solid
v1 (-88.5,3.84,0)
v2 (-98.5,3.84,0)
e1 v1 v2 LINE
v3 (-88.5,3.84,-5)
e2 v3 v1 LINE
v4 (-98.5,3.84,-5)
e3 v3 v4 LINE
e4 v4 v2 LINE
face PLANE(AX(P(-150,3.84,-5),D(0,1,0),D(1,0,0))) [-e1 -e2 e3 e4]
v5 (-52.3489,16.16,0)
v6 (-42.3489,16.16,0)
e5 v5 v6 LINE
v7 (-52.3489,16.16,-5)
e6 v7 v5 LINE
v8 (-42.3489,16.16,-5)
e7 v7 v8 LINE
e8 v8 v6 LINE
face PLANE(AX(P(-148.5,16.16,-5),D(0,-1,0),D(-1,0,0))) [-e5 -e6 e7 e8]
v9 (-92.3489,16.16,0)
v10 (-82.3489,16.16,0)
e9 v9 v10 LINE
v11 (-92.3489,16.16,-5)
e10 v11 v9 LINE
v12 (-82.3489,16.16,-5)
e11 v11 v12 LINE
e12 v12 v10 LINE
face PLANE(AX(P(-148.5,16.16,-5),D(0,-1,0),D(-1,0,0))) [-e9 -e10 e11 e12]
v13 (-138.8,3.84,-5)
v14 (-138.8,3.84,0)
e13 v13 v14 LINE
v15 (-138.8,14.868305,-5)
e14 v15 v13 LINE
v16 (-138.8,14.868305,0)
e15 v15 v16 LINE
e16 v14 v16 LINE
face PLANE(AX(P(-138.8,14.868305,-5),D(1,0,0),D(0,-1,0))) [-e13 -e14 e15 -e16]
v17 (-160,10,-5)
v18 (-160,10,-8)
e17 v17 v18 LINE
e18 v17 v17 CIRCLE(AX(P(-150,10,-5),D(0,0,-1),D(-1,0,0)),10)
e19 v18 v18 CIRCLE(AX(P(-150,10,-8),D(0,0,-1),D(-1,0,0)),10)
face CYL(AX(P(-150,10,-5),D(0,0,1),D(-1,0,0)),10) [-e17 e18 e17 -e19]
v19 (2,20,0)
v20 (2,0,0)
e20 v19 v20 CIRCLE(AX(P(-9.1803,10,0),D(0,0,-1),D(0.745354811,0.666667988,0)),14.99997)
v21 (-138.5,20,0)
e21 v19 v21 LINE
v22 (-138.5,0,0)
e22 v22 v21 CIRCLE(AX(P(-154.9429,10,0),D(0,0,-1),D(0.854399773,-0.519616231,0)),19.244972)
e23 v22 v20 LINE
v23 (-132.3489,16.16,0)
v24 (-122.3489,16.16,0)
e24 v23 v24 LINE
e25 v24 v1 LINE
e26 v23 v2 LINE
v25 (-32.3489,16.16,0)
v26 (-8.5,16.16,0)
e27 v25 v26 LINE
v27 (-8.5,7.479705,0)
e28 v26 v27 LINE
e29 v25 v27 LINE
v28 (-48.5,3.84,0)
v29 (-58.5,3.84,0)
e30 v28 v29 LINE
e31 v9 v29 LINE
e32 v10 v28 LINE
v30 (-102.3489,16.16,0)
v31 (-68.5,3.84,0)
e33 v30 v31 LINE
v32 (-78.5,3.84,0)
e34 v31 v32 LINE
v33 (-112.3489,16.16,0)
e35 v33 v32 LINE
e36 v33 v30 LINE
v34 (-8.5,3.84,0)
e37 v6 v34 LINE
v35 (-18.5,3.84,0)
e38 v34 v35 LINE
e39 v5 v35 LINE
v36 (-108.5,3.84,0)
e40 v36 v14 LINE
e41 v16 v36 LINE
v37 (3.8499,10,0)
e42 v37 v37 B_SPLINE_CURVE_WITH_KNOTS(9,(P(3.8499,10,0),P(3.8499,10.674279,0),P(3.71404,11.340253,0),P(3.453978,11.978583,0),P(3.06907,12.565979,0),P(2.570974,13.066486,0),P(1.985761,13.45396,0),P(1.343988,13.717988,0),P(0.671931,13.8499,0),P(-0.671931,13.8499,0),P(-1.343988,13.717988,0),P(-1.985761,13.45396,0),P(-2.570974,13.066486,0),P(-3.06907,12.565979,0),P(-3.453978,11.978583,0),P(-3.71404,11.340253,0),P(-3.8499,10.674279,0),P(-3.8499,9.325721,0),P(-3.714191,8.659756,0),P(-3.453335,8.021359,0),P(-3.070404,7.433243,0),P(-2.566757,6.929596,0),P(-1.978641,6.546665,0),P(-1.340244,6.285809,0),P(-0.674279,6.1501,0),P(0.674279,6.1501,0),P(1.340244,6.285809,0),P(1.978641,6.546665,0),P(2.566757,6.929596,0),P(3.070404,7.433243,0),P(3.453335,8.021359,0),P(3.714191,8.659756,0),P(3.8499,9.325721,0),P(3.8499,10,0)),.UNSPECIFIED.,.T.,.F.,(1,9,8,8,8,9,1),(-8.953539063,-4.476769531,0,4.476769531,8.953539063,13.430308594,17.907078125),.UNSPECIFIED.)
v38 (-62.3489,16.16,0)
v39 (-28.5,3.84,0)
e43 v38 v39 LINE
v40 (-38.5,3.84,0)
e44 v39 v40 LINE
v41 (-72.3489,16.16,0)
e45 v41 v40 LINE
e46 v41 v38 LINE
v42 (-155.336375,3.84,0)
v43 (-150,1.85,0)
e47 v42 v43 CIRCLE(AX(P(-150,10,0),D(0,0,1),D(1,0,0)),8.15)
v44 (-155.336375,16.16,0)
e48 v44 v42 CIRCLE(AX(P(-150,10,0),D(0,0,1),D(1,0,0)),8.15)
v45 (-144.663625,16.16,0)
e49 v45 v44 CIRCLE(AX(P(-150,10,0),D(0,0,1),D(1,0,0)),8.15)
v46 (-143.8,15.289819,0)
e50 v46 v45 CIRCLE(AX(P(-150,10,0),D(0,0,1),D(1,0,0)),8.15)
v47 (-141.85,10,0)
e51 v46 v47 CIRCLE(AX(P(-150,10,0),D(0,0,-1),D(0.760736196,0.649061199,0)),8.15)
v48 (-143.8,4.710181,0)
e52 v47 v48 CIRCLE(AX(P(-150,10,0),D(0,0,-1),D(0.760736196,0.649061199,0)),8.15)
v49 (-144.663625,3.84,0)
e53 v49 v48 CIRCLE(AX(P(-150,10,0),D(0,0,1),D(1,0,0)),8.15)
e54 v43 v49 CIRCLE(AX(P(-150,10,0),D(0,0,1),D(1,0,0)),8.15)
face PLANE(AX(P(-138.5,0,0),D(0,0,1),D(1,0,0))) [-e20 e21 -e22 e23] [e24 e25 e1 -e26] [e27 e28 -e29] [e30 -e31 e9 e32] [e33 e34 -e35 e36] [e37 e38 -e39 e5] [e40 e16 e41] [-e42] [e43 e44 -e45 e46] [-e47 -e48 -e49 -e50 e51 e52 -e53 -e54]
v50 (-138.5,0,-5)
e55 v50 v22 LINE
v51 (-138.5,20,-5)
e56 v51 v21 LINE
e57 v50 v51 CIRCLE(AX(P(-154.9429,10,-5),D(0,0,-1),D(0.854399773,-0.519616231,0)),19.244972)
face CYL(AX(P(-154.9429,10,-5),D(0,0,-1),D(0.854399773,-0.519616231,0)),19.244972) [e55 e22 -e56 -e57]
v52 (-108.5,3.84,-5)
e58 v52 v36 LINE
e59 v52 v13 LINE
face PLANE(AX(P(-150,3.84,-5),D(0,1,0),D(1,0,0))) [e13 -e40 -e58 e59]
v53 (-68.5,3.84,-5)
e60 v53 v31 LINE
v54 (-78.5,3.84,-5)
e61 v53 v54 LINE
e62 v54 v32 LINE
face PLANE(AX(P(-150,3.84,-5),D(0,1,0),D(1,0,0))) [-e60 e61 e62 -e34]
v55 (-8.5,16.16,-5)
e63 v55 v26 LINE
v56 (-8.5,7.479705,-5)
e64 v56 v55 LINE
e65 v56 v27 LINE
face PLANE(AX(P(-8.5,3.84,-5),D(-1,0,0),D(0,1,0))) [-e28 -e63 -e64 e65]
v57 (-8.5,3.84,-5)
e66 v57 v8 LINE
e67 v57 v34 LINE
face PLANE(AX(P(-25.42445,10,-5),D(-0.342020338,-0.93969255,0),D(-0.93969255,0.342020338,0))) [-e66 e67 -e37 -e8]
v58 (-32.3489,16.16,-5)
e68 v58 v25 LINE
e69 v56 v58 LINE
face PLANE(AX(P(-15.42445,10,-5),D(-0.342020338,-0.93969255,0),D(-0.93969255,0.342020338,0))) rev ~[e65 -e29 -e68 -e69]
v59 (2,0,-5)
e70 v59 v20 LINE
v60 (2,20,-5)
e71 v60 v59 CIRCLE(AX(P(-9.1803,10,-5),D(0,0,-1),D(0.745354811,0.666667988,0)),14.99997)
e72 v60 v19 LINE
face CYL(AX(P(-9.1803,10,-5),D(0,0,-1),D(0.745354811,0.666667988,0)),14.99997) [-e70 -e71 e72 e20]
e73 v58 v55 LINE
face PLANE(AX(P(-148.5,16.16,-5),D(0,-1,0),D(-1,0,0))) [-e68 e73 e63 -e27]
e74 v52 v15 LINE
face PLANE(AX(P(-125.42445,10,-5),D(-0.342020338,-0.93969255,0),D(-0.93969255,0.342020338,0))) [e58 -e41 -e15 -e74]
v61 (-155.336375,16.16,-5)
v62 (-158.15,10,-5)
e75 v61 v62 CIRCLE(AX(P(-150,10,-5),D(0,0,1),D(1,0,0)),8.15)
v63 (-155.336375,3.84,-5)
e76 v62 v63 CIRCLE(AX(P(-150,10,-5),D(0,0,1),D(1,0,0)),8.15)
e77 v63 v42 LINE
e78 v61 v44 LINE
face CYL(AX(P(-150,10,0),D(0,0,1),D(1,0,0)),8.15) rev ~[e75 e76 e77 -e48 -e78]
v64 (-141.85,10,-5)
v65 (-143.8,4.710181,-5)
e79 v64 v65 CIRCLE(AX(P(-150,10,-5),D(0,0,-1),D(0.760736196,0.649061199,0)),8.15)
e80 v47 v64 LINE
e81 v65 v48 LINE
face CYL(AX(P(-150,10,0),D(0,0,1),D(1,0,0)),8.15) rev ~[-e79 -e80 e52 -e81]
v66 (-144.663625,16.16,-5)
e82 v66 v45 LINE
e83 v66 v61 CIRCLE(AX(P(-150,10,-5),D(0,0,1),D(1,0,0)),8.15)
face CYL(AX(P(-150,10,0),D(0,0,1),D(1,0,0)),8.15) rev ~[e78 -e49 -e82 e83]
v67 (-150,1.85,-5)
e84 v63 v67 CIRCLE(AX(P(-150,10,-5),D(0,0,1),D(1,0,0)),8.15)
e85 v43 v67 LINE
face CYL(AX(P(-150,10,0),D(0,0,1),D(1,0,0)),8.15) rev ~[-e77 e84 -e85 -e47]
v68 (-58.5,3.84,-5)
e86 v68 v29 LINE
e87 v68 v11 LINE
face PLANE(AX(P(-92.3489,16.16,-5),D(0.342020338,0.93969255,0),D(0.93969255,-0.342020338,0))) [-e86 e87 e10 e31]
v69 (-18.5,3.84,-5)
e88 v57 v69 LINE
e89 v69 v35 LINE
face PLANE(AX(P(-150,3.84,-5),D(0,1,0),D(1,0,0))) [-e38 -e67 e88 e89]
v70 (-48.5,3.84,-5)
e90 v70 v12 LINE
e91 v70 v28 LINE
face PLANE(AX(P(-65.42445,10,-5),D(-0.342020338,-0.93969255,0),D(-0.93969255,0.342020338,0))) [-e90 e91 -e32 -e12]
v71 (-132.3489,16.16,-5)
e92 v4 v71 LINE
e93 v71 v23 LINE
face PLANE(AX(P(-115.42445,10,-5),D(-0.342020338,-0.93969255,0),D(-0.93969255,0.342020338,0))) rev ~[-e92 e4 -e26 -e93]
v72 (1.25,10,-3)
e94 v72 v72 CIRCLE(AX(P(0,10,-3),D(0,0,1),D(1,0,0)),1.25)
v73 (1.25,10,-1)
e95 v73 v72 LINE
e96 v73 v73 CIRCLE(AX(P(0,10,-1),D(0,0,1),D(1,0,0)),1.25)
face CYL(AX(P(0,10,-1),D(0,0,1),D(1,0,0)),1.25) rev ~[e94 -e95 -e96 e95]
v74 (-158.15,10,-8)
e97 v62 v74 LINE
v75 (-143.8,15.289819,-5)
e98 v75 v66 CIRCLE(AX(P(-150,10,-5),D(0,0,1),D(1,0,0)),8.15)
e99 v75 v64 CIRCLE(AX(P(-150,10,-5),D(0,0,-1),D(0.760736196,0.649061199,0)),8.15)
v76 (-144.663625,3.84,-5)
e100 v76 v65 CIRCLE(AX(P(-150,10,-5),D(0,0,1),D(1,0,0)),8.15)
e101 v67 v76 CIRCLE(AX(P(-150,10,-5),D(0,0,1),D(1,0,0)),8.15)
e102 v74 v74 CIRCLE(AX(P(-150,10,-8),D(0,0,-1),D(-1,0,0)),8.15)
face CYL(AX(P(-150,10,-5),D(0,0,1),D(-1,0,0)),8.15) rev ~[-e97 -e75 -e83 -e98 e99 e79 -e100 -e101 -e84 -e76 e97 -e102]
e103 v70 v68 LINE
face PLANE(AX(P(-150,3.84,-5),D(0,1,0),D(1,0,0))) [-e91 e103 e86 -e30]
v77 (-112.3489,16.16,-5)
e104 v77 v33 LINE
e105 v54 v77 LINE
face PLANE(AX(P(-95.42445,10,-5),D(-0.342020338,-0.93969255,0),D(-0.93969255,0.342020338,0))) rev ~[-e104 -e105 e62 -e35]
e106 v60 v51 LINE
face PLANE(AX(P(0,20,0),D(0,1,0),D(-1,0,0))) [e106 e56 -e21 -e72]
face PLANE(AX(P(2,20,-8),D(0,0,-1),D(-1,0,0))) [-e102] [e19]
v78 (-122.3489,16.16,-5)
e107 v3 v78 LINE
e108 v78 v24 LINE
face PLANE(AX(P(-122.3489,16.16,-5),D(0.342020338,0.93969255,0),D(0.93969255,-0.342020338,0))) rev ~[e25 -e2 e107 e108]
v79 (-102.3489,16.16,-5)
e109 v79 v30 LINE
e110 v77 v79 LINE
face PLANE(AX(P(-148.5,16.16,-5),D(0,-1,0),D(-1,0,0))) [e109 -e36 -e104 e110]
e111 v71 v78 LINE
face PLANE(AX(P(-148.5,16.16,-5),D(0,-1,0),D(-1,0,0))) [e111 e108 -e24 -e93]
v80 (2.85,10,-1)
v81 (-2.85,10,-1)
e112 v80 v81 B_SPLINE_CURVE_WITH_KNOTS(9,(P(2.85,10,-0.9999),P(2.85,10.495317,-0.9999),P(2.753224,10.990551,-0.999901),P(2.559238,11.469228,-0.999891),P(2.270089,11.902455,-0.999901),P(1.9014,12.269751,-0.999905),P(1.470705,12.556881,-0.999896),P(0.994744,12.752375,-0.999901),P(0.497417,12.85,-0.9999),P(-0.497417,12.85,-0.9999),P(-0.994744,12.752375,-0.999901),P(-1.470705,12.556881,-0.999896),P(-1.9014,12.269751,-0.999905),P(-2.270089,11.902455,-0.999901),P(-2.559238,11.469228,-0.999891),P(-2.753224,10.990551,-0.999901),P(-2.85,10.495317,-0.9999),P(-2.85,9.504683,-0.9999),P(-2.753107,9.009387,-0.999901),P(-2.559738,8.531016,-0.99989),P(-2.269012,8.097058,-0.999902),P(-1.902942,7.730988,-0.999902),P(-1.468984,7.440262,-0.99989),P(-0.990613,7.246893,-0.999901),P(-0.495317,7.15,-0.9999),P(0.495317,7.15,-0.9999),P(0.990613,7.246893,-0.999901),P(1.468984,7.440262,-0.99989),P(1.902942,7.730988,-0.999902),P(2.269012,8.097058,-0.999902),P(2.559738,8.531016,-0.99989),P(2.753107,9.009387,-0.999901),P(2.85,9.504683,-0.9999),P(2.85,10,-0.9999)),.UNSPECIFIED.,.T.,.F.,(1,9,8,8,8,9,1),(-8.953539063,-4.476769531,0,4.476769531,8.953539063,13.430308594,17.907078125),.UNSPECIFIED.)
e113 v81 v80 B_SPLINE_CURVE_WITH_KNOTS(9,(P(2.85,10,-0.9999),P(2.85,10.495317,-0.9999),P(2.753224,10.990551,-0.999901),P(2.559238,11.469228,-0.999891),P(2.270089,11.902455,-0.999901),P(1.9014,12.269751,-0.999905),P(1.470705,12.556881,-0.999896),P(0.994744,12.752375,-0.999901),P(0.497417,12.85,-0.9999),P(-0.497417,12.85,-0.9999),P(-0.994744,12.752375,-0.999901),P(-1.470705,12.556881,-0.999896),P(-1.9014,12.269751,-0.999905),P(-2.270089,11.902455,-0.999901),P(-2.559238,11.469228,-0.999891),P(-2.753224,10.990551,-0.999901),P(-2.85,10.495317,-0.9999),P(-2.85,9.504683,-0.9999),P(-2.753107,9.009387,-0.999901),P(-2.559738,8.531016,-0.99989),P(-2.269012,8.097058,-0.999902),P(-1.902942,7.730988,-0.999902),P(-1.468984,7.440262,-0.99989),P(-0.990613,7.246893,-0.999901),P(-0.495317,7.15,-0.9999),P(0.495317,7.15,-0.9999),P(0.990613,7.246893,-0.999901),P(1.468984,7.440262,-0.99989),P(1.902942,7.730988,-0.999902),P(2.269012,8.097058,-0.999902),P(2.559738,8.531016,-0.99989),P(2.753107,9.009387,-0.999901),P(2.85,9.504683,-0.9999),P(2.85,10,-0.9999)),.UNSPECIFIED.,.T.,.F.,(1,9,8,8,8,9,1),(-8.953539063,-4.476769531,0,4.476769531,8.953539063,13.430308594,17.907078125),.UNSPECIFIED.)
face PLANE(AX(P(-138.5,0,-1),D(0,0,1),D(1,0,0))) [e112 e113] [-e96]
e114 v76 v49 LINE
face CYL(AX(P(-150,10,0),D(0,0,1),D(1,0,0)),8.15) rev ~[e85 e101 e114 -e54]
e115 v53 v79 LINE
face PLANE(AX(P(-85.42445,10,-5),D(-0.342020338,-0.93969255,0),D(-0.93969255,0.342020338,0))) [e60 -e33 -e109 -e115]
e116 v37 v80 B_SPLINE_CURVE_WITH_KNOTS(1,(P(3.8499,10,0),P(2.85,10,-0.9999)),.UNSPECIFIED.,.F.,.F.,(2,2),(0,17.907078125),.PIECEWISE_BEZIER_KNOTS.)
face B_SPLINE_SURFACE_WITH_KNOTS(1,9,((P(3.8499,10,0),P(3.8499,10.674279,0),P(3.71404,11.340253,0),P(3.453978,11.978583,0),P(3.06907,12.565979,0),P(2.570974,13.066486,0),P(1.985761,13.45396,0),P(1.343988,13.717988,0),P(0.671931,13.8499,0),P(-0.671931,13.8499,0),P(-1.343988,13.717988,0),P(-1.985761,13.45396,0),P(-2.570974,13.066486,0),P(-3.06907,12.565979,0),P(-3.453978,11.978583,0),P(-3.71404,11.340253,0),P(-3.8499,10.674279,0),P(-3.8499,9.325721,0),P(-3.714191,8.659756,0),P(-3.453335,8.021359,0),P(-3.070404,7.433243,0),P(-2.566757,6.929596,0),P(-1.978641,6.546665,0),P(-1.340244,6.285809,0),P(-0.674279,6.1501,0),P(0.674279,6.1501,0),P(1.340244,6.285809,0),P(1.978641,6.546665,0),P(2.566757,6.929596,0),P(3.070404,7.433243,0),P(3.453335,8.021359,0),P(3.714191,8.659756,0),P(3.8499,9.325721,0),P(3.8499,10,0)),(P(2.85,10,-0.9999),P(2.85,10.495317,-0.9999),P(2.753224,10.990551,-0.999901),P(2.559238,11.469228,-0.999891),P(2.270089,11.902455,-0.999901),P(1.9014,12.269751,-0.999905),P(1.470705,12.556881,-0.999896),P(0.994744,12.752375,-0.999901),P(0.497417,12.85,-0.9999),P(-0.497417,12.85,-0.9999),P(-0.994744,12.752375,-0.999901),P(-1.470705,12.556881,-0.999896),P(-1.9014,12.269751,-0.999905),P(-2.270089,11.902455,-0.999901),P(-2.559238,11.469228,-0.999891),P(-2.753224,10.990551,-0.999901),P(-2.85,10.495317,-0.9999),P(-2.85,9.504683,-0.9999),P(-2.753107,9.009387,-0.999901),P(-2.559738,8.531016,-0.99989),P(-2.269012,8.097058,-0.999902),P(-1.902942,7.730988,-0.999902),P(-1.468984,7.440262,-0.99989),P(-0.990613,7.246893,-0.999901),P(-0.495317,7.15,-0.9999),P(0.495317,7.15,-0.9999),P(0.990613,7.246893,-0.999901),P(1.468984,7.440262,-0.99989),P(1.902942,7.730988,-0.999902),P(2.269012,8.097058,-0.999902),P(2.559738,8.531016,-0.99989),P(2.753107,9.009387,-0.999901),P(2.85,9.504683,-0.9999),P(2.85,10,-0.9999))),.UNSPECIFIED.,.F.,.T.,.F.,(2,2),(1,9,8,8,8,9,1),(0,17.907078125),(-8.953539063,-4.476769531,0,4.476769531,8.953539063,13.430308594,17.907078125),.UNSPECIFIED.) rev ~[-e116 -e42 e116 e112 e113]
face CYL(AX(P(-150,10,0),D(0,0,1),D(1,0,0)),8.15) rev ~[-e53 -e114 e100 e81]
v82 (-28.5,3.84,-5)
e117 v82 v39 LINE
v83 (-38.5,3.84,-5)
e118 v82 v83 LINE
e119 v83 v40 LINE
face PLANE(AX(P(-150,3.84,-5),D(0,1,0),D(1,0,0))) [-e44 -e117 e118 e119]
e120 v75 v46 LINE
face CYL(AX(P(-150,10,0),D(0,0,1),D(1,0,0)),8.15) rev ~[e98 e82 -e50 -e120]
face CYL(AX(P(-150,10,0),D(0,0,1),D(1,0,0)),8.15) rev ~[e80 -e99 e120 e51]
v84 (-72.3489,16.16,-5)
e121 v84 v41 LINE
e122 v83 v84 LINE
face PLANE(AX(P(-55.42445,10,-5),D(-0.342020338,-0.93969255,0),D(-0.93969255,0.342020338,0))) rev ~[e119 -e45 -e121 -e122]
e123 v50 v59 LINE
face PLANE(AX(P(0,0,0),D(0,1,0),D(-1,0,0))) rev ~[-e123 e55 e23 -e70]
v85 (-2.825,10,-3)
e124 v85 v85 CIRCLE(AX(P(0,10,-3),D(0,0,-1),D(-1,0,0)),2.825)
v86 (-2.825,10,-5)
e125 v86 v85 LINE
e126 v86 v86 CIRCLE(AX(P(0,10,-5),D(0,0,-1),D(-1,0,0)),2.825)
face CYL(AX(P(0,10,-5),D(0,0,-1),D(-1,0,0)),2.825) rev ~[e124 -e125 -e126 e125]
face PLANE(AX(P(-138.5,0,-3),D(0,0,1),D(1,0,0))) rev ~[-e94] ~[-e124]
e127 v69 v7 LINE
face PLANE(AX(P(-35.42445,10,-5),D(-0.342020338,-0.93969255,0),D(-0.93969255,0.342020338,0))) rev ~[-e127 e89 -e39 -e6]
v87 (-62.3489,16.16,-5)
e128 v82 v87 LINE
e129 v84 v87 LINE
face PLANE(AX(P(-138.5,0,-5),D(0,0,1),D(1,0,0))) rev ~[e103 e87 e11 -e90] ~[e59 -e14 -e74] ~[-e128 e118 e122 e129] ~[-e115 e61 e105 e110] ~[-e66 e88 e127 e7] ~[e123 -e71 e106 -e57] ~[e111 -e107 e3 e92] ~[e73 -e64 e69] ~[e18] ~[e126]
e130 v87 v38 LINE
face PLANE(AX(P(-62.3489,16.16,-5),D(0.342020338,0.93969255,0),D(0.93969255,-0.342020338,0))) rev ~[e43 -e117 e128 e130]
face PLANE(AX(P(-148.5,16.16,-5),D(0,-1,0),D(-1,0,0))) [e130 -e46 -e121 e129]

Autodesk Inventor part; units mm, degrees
ref_plane "YZ Plane" through (0, 0, 0) normal (1, 0, 0) x (0, 1, 0)
ref_plane "XZ Plane" through (0, 0, 0) normal (0, 1, 0) x (-1, 0, 0)
sketch "Szkic1" plane through (0, 0, 0) normal (0, 1, 0) x (-1, 0, 0)
  line L0 (0, 0) -> (150, 0)
  line L1 (150, 0) -> (150, -5)
  line L2 (150, -5) -> (0, -5)
  line L3 (0, -5) -> (0, 0)
  dimension "d0" = 150
  dimension "d1" = 5
extrude "Wyciągnięcie proste1" add sketch "Szkic1" along normal blind 20
sketch "Szkic2" plane through (0, 0, -5) normal (0, 0, -1) x (-1, 0, 0)
  line L0 (0, 0) -> (0, 20) projected
  circle A0 centre (0, 10) radius 2.95
  line L1 (0, 20) -> (-2, 20)
  line L2 (0, 0) -> (-2, 0)
  arc A1 (-2, 20) -> (-2, 0) centre (9.1803, 10) ccw
  line L3 (0, 10) -> (150, 10)
  line L4 (150, 10) -> (138.5, 10)
  line L5 (138.5, 10) -> (170.9, 10)
  line L6 (150, 0) -> (150, 20) projected
  line L7 (138.5, 10) -> (170.9, 10) construction
  line L8 (138.5, 10) -> (170.9, 10)
  line L9 (170.9, 10) -> (170.9, 16.16)
  line L10 (170.9, 16.16) -> (138.5, 16.16)
  line L11 (138.5, 16.16) -> (138.5, 10)
  line L12 (138.5, 10) -> (170.9, 10)
  line L13 (170.9, 10) -> (170.9, 3.84)
  line L14 (170.9, 3.84) -> (138.5, 3.84)
  line L15 (138.5, 3.84) -> (138.5, 10)
  line L16 (0, 0) -> (150, 0) projected
  line L17 (0, 20) -> (150, 20) projected
  arc A2 (138.5, 0) -> (138.5, 20) centre (154.9429, 10) ccw
  point P0 (150, 3.84)
  point P1 (150, 16.16)
  point P2 (0, 7.05)
  point P3 (0, 12.95)
  dimension "d4" = 5.9
  dimension "d5" = 2
  dimension "d6" = 2
  dimension "d7" = 15
  dimension "d8" = 150
  dimension "d9" = 11.5
  dimension "d10" = 32.4
  dimension "d11" = 0
  dimension "d12" = 6.16
  dimension "d13" = 6.16
extrude "Wyciągnięcie proste2" add sketch "Szkic2" against normal blind 5 contours L2 A1 L1 L0 A0 | L16 L6 L14 L13 L9 L10 L17 A2
sketch "Szkic3" plane through (2, 20, -5) normal (0, 0, -1) x (-1, 0, 0)
  arc A0 (2, -7.05) -> (2, -12.95) centre (2, -10) ccw projected
  circle A1 centre (2, -10) radius 2.95
  line L0 (152, -16.16) -> (152, -3.84) projected
  line L1 (152, -16.16) -> (150.5, -16.16)
  line L2 (150.5, -16.16) -> (150.5, -3.84)
  line L3 (150.5, -3.84) -> (152, -3.84)
  line L4 (140.5, -16.16) -> (10.5, -16.16)
  line L5 (10.5, -16.16) -> (10.5, -3.84)
  line L6 (10.5, -3.84) -> (140.5, -3.84)
  line L7 (140.5, -3.84) -> (140.5, -16.16)
  line L8 (150.5, -16.16) -> (150.3, -16.16)
  line L9 (150.3, -16.16) -> (150.3, -3.84)
  line L10 (150.3, -3.84) -> (150.5, -3.84)
  line L11 (152, -16.16) -> (140.5, -16.16)
  line L12 (140.5, -16.16) -> (140.5, -3.84)
  line L13 (140.5, -3.84) -> (152, -3.84)
  line L14 (152, -3.84) -> (152, -16.16)
  point P0 (2, -20)
  dimension "d16" = 1.5
  dimension "d17" = 130
  dimension "d18" = 12.32
  dimension "d21" = 0.2
  dimension "d24" = 11.5
extrude "Wyciągnięcie proste3" cut sketch "Szkic3" against normal through all
sketch "Szkic5" plane through (2, 20, -5) normal (0, 0, -1) x (-1, 0, 0)
  circle A0 centre (2, -10) radius 2.95 projected
  line L0 (2, -10) -> (152, -10)
  line L1 (2, -10) -> (152, -10) construction
  circle A1 centre (152, -10) radius 5.0551
  line L2 (152, -10) -> (145.8, -10)
  line L3 (145.8, -10) -> (145.8, -3.84)
  line L4 (10.5, -3.84) -> (172.9, -3.84) projected
  line L5 (145.8, -3.84) -> (140.8, -3.84)
  line L6 (140.8, -3.84) -> (140.8, -16.16)
  line L7 (172.9, -16.16) -> (10.5, -16.16) projected
  line L8 (145.8, -10) -> (145.8, -16.16)
  line L9 (145.8, -16.16) -> (140.8, -16.16)
  line L10 (10.5, -16.16) -> (10.5, -3.84) projected
  line L11 (10.5, -16.16) -> (44.3489, -3.84)
  line L12 (10.5, -16.16) -> (46.5213, -16.16) construction
  line L13 (44.3489, -3.84) -> (54.3489, -3.84)
  line L14 (10.5, -16.16) -> (20.5, -16.16)
  line L15 (20.5, -16.16) -> (54.3489, -3.84)
  line L16 (20.5, -16.16) -> (30.5, -16.16)
  line L17 (54.3489, -3.84) -> (64.3489, -3.84)
  line L18 (64.3489, -3.84) -> (30.5, -16.16)
  line L19 (44.3489, -3.84) -> (34.3489, -3.84)
  line L20 (10.5, -16.16) -> (0.5, -16.16)
  line L21 (0.5, -16.16) -> (34.3489, -3.84)
  line L22 (40.5, -16.16) -> (74.3489, -3.84)
  line L23 (50.5, -16.16) -> (84.3489, -3.84)
  line L24 (94.3489, -3.84) -> (60.5, -16.16)
  line L25 (30.5, -16.16) -> (64.3489, -3.84)
  line L26 (70.5, -16.16) -> (104.3489, -3.84)
  line L27 (80.5, -16.16) -> (114.3489, -3.84)
  line L28 (124.3489, -3.84) -> (90.5, -16.16)
  line L29 (60.5, -16.16) -> (94.3489, -3.84)
  line L30 (100.5, -16.16) -> (134.3489, -3.84)
  line L31 (110.5, -16.16) -> (144.3489, -3.84)
  line L32 (90.5, -16.16) -> (124.3489, -3.84)
  point P0 (2, -20)
  point P1 (10.5, -12.5203)
  point P2 (60.5, -16.16)
  point P3 (140.8, -5.1317)
  dimension "d25" = 150
  dimension "d26" = 0
  dimension "d27" = 6.2
  dimension "d28" = 5
  dimension "d29" = 20
  dimension "d30" = 10
  dimension "d31" = 10
  dimension "d32" = 10
  dimension "d33" = 10
  dimension "d34" = 10
  dimension "d35" = 10
  dimension "d36" = 10
  dimension "d37" = 10
  dimension "d38" = 10
  dimension "d39" = 10
  dimension "d40" = 10
  dimension "d41" = 10
  dimension "d42" = 10
  dimension "d43" = 10
  dimension "d44" = 10
  dimension "d45" = 10
  dimension "d46" = 10
  dimension "d47" = 10
  dimension "d48" = 10
  dimension "d49" = 10
  dimension "d52" = 10
  dimension "d53" = 10
extrude "Wyciągnięcie proste4" add sketch "Szkic5" against normal blind 5 contours L21 L4 L11 L0 | L0 L11 L10 L21 | L15 L4 L18 L0 | L0 L18 L7 L15 | L22 L4 L23 L0 | L0 L23 L7 L22 | L24 L4 L26 L0 | L0 L26 L7 L24 | L27 L4 L28 L0 | L0 L28 L7 L27 | L30 L4 L6 L31 L0 | L0 L31 L7 L30 | L6 L31 L4 L3 L0 | L0 L8 L7 L6 | L6 L4 L31
sketch "Szkic6" plane through (-138.5, 0, 0) normal (0, 0, 1) x (1, 0, 0)
  circle A0 centre (138.5, 10) radius 2.95 projected
  circle A1 centre (138.5, 10) radius 2.85
  circle A2 centre (138.5, 10) radius 2.95
  point P0 (138.5, 0)
  dimension "d56" = 5.7
extrude "Wyciągnięcie proste5" add sketch "Szkic6" against normal blind 5
ref_plane "Płaszczyzna konstrukcyjna1" through (-138.5, 0, -1) normal (0, 0, 1) x (1, 0, 0)
sketch "Szkic7" plane through (-138.5, 0, -1) normal (0, 0, 1) x (1, 0, 0)
  circle A0 centre (138.5, 10) radius 2.85 projected
  circle A1 centre (138.5, 10) radius 1.25
  circle A2 centre (138.5, 10) radius 2.85
  point P0 (138.5, 0)
  dimension "d60" = 2.5
extrude "Wyciągnięcie proste6" add sketch "Szkic7" against normal blind 2
sketch "Szkic8" plane through (-138.5, 0, 0) normal (0, 0, 1) x (1, 0, 0)
  point P0 (138.5, 0)
sketch "Szkic9" plane through (-138.5, 0, 0) normal (0, 0, 1) x (1, 0, 0)
  circle A0 centre (138.5, 10) radius 1.25 projected
  line L0 (138.5, 10) -> (-11.5, 10)
  line L1 (138.5, 10) -> (288.5, 10) construction
  circle A1 centre (-11.5, 10) radius 8.15
  point P0 (138.5, 0)
  dimension "d63" = 150
  dimension "d64" = 180
  dimension "d65" = 16.3
extrude "Wyciągnięcie proste7" cut sketch "Szkic9" against normal through all contours A1
sketch "Szkic10" plane through (-138.5, 0, 0) normal (0, 0, 1) x (1, 0, 0)
  arc A0 (-5.3, 4.7102) -> (-5.3, 15.2898) centre (-11.5, 10) ccw projected
  circle A1 centre (-11.5, 10) radius 8.15
  line L0 (-32.5164, 20) -> (-2.9538, 20)
  line L1 (-2.9538, 20) -> (-2.9538, 1.85)
  line L2 (-2.9538, 1.85) -> (-32.5164, 1.85)
  line L3 (-32.5164, 1.85) -> (-32.5164, 20)
  point P0 (138.5, 0)
  point P1 (-11.5, 1.85)
  point P2 (-5.3, 15.2898)
extrude "Wyciągnięcie proste8" add sketch "Szkic10" against normal blind 5
sketch "Szkic11" plane through (2, 20, -5) normal (0, 0, -1) x (-1, 0, 0)
  circle A0 centre (152, -10) radius 8.15 projected
  circle A1 centre (152, -10) radius 8.15
  circle A2 centre (152, -10) radius 10
  point P0 (2, -20)
  dimension "d70" = 20
extrude "Wyciągnięcie proste9" add sketch "Szkic11" along normal blind 3
sketch "Szkic12" plane through (-138.5, 0, 0) normal (0, 0, 1) x (1, 0, 0)
  line L0 (135.65, 12.85) -> (141.4166, 12.85)
  line L1 (141.4166, 12.85) -> (141.4166, 7.15)
  line L2 (141.4166, 7.15) -> (135.65, 7.15)
  line L3 (135.65, 7.15) -> (135.65, 12.85)
  circle A0 centre (138.5, 10) radius 2.85 projected
  line L4 (141.35, 10) -> (141.35, 7.15)
  line L5 (141.35, 10) -> (141.35, 12.85)
  point P0 (138.5, 0)
extrude "Wyciągnięcie proste10" cut sketch "Szkic12" against normal blind 0.5 contours A0
chamfer "Faza1" distance 1 angle 45 1 edges at (-2.85, 10, 0)
sketch "Szkic13" plane through (2, 20, -5) normal (0, 0, -1) x (-1, 0, 0)
  circle A0 centre (2, -10) radius 2.85 projected
  circle A1 centre (2, -10) radius 2.85
  circle A2 centre (2, -10) radius 2.825
  point P0 (2, -20)
  dimension "d78" = 5.65
extrude "Wyciągnięcie proste11" add sketch "Szkic13" against normal blind 4
properties part number "arm_v3_backup"
